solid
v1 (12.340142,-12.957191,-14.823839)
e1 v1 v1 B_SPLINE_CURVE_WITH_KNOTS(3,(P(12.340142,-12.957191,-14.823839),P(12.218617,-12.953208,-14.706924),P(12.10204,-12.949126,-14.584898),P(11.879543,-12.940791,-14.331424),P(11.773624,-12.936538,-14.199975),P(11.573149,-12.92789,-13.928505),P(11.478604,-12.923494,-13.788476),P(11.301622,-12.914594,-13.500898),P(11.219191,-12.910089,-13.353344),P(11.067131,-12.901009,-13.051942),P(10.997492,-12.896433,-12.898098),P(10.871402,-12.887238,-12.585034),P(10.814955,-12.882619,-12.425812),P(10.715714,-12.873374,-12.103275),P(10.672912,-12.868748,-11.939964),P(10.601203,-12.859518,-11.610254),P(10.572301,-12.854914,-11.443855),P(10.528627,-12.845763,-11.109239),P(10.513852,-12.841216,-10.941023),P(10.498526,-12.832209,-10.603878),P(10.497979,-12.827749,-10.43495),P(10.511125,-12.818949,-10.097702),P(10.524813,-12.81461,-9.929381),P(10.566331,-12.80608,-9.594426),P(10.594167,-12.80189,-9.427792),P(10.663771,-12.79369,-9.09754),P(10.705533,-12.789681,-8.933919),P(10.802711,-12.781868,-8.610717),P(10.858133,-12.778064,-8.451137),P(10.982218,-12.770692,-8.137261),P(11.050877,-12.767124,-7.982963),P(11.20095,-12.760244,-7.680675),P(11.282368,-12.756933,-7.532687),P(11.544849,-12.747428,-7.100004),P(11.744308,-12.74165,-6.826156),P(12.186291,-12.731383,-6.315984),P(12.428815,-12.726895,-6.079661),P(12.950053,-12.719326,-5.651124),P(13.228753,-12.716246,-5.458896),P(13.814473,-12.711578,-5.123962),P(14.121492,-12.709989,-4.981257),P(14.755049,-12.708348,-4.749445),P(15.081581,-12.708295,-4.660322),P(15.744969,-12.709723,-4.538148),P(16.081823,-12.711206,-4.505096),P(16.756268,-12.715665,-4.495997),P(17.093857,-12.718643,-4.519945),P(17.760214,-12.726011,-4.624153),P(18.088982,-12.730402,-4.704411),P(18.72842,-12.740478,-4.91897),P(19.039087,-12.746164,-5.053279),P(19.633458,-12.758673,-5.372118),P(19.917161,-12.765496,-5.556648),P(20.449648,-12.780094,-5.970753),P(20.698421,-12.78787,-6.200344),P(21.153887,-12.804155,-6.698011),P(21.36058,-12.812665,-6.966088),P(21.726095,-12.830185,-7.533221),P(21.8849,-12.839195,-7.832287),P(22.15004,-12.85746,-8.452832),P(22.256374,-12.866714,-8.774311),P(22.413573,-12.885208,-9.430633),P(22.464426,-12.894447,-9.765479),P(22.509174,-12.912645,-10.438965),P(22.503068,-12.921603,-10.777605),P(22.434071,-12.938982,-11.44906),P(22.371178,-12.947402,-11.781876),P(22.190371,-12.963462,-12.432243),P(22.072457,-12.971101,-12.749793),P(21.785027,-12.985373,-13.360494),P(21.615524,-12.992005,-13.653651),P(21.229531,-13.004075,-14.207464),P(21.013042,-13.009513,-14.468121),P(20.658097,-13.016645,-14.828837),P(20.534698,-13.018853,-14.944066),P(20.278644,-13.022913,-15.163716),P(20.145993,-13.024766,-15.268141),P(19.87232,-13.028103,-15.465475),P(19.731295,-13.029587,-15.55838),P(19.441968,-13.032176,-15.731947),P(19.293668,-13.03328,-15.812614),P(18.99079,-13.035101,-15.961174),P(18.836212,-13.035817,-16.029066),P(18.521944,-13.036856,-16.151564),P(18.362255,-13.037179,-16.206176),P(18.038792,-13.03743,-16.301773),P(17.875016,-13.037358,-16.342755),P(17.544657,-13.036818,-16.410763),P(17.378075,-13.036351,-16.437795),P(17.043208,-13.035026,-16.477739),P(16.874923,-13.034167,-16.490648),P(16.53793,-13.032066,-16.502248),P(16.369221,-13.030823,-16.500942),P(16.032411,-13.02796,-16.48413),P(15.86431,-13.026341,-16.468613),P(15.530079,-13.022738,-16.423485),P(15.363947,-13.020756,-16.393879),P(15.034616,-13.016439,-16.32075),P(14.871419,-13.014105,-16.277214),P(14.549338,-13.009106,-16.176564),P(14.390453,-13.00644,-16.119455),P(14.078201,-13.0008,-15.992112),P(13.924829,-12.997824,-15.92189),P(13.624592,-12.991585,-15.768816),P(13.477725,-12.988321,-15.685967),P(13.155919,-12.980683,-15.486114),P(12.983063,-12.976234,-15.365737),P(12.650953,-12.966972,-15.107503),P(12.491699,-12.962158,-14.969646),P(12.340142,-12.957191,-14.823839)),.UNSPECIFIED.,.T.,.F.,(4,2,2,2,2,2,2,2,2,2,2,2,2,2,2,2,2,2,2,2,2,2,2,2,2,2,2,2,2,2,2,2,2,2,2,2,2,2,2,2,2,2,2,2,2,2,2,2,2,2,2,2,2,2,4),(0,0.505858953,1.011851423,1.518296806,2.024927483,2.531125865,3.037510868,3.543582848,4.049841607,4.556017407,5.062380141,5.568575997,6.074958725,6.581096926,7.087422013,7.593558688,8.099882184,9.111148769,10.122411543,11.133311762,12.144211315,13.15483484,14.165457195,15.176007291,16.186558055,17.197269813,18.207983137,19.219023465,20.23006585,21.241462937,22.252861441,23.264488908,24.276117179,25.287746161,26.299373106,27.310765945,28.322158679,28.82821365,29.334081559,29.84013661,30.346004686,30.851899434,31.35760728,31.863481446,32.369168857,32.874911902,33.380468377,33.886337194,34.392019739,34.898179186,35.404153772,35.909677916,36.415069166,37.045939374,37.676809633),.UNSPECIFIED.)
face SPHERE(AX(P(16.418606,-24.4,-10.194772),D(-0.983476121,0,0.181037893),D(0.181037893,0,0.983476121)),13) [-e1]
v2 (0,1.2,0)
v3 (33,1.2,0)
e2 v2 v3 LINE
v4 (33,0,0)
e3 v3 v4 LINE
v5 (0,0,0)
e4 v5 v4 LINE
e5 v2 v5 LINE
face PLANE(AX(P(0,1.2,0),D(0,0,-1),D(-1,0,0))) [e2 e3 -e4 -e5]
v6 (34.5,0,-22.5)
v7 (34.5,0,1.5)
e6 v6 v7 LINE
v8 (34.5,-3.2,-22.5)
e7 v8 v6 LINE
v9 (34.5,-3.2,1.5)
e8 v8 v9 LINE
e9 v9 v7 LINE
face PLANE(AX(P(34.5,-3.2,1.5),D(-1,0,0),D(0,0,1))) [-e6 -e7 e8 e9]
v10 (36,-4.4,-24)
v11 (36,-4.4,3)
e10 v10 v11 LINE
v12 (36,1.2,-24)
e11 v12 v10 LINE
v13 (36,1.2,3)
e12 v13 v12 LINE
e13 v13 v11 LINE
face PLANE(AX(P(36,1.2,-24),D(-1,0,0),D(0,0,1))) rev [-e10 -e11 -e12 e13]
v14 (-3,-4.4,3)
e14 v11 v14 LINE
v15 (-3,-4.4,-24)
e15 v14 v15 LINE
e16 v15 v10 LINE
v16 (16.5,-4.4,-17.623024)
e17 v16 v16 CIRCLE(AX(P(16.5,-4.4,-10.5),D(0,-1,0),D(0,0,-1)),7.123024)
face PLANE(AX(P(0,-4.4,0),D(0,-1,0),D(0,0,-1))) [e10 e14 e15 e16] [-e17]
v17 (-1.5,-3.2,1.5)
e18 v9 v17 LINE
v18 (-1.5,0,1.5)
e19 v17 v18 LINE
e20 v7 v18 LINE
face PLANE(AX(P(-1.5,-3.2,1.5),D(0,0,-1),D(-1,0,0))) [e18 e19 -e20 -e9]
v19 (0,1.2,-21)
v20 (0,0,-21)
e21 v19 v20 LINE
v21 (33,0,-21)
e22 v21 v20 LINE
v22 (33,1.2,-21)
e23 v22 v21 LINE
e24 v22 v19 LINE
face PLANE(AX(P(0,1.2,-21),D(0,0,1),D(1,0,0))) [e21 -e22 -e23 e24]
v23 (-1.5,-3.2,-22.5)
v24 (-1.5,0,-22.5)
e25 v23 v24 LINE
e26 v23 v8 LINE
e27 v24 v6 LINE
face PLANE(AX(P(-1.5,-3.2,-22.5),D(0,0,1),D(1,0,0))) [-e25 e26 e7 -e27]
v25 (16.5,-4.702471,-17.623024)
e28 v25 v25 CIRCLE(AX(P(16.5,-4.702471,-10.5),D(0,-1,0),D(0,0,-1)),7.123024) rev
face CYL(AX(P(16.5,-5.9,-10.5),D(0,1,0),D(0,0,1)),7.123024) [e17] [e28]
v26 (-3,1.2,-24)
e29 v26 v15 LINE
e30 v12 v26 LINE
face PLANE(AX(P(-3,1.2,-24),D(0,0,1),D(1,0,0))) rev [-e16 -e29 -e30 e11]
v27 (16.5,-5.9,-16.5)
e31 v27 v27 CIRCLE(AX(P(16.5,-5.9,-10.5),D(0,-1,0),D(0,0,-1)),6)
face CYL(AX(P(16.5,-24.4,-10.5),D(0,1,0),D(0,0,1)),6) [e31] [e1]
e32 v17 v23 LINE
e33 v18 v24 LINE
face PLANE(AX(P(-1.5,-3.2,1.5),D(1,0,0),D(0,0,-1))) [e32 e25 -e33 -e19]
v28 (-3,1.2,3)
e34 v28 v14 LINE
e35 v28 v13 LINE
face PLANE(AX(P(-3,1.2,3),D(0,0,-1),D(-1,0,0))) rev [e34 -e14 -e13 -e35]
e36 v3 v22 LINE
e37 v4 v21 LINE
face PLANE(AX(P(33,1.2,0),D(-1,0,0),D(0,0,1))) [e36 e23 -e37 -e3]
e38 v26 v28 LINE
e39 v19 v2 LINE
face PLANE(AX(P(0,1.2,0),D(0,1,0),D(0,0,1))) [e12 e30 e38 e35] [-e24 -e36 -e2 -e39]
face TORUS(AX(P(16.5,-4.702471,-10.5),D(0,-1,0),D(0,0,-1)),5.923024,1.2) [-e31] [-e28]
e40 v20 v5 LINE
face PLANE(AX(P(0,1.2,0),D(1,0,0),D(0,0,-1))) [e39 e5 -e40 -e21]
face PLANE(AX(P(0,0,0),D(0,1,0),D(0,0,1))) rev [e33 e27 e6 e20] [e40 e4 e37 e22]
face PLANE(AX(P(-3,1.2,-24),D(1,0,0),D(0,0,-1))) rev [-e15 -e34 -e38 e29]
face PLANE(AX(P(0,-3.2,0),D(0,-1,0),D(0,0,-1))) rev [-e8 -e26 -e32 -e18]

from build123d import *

# Parameters (mm, degrees)
ESQUISSE1_W        = 39
ESQUISSE1_H        = 27
ESQUISSE1_W_2      = 33
ESQUISSE1_H_2      = 21
BOSS_EXTRU_1_DEPTH = 1.2
ESQUISSE2_W        = 39
ESQUISSE2_H        = 27
ESQUISSE2_W_2      = 36
ESQUISSE2_H_2      = 24
BOSS_EXTRU_3_DEPTH = 3.2
ESQUISSE3_W        = 39
ESQUISSE3_H        = 27
BOSS_EXTRU_4_DEPTH = 1.2
ESQUISSE5_R        = 6
BOSS_EXTRU_6_DEPTH = 20
ESQUISSE6_R        = 7.123023745
BOSS_EXTRU_7_DEPTH = 1.5
CONG_1_R           = 1.2


with BuildPart() as part:
    # Esquisse1 → Boss.-Extru.1 (new body)
    with BuildSketch(Plane(origin=(0, 0, 0), x_dir=(1, 0, 0), z_dir=(0, 1, 0))):
        with Locations((16.5, 10.5)):
            Rectangle(ESQUISSE1_W, ESQUISSE1_H)
        with Locations((16.5, 10.5)):
            Rectangle(ESQUISSE1_W_2, ESQUISSE1_H_2, mode=Mode.SUBTRACT)
    extrude(amount=BOSS_EXTRU_1_DEPTH)

    # Esquisse2 → Boss.-Extru.3 (add)
    with BuildSketch(Plane(origin=(0, 0, 0), x_dir=(-1, 0, 0), z_dir=(0, -1, 0))):
        with Locations((-16.5, 10.5)):
            Rectangle(ESQUISSE2_W, ESQUISSE2_H)
        with Locations((-16.5, 10.5)):
            Rectangle(ESQUISSE2_W_2, ESQUISSE2_H_2, mode=Mode.SUBTRACT)
    extrude(amount=BOSS_EXTRU_3_DEPTH)

    # Esquisse3 → Boss.-Extru.4 (add)
    with BuildSketch(Plane(origin=(0, -3.2, 0), x_dir=(-1, 0, 0), z_dir=(0, -1, 0))):
        with Locations((-16.5, 10.5)):
            Rectangle(ESQUISSE3_W, ESQUISSE3_H)
    extrude(amount=BOSS_EXTRU_4_DEPTH)

    # Esquisse5 → Boss.-Extru.6 (add)
    with BuildSketch(Plane(origin=(0, -4.4, 0), x_dir=(-1, 0, 0), z_dir=(0, -1, 0))):
        with Locations(Location((-16.5, 10.5, 0), (0, 0, 90))):
            Circle(ESQUISSE5_R)
    extrude(amount=BOSS_EXTRU_6_DEPTH)

    # Esquisse6 → Boss.-Extru.7 (add)
    with BuildSketch(Plane.XZ.offset(4.4)):
        with Locations(Location((16.5, -10.5, 0), (0, 0, 270))):
            Circle(ESQUISSE6_R)
    extrude(amount=BOSS_EXTRU_7_DEPTH)

    # Congé1
    # the kernel refuses this fillet: 1.2 mm, written as the material it takes off along each edge
    with BuildSketch(Plane(origin=(16.5, -5.9, -10.5), x_dir=(0, 0, -1), z_dir=(-1, 0, 0))) as cong_1_piece_1:
        with BuildLine():
            CenterArc((5.923023745, -1.197528562), CONG_1_R, 0, 86.32212933)
            Line((6, 0), (6.001539525, 0.023950571))
            ThreePointArc((6.001539525, 0.023950571), (6.561511873, 0.024), (7.123023745, 0.024))
            Line((7.123023745, 0.024), (7.147023745, 0))
            Line((7.147023745, 0), (7.147023745, -1.197528562))
            Line((7.147023745, -1.197528562), (7.123023745, -1.197528562))
        make_face()
    revolve(axis=Axis((16.5, -5.9, -10.5), (0, -1, 0)), mode=Mode.SUBTRACT)

    # Esquisse7 → Révolution2 (revolve)
    with BuildSketch(Plane.XZ.offset(24.4)):
        with BuildLine():
            Line((3.633416396, -7.841279791), (29.203795551, -12.548265009))
            ThreePointArc((29.203795551, -12.548265009), (14.065113365, -22.979961978), (3.633416396, -7.841279791))
        make_face()
    revolve(axis=Axis((3.633416396, -24.4, -7.841279791), (0.9834761213686738, 0, -0.181037892988263)))


solid = part.part
